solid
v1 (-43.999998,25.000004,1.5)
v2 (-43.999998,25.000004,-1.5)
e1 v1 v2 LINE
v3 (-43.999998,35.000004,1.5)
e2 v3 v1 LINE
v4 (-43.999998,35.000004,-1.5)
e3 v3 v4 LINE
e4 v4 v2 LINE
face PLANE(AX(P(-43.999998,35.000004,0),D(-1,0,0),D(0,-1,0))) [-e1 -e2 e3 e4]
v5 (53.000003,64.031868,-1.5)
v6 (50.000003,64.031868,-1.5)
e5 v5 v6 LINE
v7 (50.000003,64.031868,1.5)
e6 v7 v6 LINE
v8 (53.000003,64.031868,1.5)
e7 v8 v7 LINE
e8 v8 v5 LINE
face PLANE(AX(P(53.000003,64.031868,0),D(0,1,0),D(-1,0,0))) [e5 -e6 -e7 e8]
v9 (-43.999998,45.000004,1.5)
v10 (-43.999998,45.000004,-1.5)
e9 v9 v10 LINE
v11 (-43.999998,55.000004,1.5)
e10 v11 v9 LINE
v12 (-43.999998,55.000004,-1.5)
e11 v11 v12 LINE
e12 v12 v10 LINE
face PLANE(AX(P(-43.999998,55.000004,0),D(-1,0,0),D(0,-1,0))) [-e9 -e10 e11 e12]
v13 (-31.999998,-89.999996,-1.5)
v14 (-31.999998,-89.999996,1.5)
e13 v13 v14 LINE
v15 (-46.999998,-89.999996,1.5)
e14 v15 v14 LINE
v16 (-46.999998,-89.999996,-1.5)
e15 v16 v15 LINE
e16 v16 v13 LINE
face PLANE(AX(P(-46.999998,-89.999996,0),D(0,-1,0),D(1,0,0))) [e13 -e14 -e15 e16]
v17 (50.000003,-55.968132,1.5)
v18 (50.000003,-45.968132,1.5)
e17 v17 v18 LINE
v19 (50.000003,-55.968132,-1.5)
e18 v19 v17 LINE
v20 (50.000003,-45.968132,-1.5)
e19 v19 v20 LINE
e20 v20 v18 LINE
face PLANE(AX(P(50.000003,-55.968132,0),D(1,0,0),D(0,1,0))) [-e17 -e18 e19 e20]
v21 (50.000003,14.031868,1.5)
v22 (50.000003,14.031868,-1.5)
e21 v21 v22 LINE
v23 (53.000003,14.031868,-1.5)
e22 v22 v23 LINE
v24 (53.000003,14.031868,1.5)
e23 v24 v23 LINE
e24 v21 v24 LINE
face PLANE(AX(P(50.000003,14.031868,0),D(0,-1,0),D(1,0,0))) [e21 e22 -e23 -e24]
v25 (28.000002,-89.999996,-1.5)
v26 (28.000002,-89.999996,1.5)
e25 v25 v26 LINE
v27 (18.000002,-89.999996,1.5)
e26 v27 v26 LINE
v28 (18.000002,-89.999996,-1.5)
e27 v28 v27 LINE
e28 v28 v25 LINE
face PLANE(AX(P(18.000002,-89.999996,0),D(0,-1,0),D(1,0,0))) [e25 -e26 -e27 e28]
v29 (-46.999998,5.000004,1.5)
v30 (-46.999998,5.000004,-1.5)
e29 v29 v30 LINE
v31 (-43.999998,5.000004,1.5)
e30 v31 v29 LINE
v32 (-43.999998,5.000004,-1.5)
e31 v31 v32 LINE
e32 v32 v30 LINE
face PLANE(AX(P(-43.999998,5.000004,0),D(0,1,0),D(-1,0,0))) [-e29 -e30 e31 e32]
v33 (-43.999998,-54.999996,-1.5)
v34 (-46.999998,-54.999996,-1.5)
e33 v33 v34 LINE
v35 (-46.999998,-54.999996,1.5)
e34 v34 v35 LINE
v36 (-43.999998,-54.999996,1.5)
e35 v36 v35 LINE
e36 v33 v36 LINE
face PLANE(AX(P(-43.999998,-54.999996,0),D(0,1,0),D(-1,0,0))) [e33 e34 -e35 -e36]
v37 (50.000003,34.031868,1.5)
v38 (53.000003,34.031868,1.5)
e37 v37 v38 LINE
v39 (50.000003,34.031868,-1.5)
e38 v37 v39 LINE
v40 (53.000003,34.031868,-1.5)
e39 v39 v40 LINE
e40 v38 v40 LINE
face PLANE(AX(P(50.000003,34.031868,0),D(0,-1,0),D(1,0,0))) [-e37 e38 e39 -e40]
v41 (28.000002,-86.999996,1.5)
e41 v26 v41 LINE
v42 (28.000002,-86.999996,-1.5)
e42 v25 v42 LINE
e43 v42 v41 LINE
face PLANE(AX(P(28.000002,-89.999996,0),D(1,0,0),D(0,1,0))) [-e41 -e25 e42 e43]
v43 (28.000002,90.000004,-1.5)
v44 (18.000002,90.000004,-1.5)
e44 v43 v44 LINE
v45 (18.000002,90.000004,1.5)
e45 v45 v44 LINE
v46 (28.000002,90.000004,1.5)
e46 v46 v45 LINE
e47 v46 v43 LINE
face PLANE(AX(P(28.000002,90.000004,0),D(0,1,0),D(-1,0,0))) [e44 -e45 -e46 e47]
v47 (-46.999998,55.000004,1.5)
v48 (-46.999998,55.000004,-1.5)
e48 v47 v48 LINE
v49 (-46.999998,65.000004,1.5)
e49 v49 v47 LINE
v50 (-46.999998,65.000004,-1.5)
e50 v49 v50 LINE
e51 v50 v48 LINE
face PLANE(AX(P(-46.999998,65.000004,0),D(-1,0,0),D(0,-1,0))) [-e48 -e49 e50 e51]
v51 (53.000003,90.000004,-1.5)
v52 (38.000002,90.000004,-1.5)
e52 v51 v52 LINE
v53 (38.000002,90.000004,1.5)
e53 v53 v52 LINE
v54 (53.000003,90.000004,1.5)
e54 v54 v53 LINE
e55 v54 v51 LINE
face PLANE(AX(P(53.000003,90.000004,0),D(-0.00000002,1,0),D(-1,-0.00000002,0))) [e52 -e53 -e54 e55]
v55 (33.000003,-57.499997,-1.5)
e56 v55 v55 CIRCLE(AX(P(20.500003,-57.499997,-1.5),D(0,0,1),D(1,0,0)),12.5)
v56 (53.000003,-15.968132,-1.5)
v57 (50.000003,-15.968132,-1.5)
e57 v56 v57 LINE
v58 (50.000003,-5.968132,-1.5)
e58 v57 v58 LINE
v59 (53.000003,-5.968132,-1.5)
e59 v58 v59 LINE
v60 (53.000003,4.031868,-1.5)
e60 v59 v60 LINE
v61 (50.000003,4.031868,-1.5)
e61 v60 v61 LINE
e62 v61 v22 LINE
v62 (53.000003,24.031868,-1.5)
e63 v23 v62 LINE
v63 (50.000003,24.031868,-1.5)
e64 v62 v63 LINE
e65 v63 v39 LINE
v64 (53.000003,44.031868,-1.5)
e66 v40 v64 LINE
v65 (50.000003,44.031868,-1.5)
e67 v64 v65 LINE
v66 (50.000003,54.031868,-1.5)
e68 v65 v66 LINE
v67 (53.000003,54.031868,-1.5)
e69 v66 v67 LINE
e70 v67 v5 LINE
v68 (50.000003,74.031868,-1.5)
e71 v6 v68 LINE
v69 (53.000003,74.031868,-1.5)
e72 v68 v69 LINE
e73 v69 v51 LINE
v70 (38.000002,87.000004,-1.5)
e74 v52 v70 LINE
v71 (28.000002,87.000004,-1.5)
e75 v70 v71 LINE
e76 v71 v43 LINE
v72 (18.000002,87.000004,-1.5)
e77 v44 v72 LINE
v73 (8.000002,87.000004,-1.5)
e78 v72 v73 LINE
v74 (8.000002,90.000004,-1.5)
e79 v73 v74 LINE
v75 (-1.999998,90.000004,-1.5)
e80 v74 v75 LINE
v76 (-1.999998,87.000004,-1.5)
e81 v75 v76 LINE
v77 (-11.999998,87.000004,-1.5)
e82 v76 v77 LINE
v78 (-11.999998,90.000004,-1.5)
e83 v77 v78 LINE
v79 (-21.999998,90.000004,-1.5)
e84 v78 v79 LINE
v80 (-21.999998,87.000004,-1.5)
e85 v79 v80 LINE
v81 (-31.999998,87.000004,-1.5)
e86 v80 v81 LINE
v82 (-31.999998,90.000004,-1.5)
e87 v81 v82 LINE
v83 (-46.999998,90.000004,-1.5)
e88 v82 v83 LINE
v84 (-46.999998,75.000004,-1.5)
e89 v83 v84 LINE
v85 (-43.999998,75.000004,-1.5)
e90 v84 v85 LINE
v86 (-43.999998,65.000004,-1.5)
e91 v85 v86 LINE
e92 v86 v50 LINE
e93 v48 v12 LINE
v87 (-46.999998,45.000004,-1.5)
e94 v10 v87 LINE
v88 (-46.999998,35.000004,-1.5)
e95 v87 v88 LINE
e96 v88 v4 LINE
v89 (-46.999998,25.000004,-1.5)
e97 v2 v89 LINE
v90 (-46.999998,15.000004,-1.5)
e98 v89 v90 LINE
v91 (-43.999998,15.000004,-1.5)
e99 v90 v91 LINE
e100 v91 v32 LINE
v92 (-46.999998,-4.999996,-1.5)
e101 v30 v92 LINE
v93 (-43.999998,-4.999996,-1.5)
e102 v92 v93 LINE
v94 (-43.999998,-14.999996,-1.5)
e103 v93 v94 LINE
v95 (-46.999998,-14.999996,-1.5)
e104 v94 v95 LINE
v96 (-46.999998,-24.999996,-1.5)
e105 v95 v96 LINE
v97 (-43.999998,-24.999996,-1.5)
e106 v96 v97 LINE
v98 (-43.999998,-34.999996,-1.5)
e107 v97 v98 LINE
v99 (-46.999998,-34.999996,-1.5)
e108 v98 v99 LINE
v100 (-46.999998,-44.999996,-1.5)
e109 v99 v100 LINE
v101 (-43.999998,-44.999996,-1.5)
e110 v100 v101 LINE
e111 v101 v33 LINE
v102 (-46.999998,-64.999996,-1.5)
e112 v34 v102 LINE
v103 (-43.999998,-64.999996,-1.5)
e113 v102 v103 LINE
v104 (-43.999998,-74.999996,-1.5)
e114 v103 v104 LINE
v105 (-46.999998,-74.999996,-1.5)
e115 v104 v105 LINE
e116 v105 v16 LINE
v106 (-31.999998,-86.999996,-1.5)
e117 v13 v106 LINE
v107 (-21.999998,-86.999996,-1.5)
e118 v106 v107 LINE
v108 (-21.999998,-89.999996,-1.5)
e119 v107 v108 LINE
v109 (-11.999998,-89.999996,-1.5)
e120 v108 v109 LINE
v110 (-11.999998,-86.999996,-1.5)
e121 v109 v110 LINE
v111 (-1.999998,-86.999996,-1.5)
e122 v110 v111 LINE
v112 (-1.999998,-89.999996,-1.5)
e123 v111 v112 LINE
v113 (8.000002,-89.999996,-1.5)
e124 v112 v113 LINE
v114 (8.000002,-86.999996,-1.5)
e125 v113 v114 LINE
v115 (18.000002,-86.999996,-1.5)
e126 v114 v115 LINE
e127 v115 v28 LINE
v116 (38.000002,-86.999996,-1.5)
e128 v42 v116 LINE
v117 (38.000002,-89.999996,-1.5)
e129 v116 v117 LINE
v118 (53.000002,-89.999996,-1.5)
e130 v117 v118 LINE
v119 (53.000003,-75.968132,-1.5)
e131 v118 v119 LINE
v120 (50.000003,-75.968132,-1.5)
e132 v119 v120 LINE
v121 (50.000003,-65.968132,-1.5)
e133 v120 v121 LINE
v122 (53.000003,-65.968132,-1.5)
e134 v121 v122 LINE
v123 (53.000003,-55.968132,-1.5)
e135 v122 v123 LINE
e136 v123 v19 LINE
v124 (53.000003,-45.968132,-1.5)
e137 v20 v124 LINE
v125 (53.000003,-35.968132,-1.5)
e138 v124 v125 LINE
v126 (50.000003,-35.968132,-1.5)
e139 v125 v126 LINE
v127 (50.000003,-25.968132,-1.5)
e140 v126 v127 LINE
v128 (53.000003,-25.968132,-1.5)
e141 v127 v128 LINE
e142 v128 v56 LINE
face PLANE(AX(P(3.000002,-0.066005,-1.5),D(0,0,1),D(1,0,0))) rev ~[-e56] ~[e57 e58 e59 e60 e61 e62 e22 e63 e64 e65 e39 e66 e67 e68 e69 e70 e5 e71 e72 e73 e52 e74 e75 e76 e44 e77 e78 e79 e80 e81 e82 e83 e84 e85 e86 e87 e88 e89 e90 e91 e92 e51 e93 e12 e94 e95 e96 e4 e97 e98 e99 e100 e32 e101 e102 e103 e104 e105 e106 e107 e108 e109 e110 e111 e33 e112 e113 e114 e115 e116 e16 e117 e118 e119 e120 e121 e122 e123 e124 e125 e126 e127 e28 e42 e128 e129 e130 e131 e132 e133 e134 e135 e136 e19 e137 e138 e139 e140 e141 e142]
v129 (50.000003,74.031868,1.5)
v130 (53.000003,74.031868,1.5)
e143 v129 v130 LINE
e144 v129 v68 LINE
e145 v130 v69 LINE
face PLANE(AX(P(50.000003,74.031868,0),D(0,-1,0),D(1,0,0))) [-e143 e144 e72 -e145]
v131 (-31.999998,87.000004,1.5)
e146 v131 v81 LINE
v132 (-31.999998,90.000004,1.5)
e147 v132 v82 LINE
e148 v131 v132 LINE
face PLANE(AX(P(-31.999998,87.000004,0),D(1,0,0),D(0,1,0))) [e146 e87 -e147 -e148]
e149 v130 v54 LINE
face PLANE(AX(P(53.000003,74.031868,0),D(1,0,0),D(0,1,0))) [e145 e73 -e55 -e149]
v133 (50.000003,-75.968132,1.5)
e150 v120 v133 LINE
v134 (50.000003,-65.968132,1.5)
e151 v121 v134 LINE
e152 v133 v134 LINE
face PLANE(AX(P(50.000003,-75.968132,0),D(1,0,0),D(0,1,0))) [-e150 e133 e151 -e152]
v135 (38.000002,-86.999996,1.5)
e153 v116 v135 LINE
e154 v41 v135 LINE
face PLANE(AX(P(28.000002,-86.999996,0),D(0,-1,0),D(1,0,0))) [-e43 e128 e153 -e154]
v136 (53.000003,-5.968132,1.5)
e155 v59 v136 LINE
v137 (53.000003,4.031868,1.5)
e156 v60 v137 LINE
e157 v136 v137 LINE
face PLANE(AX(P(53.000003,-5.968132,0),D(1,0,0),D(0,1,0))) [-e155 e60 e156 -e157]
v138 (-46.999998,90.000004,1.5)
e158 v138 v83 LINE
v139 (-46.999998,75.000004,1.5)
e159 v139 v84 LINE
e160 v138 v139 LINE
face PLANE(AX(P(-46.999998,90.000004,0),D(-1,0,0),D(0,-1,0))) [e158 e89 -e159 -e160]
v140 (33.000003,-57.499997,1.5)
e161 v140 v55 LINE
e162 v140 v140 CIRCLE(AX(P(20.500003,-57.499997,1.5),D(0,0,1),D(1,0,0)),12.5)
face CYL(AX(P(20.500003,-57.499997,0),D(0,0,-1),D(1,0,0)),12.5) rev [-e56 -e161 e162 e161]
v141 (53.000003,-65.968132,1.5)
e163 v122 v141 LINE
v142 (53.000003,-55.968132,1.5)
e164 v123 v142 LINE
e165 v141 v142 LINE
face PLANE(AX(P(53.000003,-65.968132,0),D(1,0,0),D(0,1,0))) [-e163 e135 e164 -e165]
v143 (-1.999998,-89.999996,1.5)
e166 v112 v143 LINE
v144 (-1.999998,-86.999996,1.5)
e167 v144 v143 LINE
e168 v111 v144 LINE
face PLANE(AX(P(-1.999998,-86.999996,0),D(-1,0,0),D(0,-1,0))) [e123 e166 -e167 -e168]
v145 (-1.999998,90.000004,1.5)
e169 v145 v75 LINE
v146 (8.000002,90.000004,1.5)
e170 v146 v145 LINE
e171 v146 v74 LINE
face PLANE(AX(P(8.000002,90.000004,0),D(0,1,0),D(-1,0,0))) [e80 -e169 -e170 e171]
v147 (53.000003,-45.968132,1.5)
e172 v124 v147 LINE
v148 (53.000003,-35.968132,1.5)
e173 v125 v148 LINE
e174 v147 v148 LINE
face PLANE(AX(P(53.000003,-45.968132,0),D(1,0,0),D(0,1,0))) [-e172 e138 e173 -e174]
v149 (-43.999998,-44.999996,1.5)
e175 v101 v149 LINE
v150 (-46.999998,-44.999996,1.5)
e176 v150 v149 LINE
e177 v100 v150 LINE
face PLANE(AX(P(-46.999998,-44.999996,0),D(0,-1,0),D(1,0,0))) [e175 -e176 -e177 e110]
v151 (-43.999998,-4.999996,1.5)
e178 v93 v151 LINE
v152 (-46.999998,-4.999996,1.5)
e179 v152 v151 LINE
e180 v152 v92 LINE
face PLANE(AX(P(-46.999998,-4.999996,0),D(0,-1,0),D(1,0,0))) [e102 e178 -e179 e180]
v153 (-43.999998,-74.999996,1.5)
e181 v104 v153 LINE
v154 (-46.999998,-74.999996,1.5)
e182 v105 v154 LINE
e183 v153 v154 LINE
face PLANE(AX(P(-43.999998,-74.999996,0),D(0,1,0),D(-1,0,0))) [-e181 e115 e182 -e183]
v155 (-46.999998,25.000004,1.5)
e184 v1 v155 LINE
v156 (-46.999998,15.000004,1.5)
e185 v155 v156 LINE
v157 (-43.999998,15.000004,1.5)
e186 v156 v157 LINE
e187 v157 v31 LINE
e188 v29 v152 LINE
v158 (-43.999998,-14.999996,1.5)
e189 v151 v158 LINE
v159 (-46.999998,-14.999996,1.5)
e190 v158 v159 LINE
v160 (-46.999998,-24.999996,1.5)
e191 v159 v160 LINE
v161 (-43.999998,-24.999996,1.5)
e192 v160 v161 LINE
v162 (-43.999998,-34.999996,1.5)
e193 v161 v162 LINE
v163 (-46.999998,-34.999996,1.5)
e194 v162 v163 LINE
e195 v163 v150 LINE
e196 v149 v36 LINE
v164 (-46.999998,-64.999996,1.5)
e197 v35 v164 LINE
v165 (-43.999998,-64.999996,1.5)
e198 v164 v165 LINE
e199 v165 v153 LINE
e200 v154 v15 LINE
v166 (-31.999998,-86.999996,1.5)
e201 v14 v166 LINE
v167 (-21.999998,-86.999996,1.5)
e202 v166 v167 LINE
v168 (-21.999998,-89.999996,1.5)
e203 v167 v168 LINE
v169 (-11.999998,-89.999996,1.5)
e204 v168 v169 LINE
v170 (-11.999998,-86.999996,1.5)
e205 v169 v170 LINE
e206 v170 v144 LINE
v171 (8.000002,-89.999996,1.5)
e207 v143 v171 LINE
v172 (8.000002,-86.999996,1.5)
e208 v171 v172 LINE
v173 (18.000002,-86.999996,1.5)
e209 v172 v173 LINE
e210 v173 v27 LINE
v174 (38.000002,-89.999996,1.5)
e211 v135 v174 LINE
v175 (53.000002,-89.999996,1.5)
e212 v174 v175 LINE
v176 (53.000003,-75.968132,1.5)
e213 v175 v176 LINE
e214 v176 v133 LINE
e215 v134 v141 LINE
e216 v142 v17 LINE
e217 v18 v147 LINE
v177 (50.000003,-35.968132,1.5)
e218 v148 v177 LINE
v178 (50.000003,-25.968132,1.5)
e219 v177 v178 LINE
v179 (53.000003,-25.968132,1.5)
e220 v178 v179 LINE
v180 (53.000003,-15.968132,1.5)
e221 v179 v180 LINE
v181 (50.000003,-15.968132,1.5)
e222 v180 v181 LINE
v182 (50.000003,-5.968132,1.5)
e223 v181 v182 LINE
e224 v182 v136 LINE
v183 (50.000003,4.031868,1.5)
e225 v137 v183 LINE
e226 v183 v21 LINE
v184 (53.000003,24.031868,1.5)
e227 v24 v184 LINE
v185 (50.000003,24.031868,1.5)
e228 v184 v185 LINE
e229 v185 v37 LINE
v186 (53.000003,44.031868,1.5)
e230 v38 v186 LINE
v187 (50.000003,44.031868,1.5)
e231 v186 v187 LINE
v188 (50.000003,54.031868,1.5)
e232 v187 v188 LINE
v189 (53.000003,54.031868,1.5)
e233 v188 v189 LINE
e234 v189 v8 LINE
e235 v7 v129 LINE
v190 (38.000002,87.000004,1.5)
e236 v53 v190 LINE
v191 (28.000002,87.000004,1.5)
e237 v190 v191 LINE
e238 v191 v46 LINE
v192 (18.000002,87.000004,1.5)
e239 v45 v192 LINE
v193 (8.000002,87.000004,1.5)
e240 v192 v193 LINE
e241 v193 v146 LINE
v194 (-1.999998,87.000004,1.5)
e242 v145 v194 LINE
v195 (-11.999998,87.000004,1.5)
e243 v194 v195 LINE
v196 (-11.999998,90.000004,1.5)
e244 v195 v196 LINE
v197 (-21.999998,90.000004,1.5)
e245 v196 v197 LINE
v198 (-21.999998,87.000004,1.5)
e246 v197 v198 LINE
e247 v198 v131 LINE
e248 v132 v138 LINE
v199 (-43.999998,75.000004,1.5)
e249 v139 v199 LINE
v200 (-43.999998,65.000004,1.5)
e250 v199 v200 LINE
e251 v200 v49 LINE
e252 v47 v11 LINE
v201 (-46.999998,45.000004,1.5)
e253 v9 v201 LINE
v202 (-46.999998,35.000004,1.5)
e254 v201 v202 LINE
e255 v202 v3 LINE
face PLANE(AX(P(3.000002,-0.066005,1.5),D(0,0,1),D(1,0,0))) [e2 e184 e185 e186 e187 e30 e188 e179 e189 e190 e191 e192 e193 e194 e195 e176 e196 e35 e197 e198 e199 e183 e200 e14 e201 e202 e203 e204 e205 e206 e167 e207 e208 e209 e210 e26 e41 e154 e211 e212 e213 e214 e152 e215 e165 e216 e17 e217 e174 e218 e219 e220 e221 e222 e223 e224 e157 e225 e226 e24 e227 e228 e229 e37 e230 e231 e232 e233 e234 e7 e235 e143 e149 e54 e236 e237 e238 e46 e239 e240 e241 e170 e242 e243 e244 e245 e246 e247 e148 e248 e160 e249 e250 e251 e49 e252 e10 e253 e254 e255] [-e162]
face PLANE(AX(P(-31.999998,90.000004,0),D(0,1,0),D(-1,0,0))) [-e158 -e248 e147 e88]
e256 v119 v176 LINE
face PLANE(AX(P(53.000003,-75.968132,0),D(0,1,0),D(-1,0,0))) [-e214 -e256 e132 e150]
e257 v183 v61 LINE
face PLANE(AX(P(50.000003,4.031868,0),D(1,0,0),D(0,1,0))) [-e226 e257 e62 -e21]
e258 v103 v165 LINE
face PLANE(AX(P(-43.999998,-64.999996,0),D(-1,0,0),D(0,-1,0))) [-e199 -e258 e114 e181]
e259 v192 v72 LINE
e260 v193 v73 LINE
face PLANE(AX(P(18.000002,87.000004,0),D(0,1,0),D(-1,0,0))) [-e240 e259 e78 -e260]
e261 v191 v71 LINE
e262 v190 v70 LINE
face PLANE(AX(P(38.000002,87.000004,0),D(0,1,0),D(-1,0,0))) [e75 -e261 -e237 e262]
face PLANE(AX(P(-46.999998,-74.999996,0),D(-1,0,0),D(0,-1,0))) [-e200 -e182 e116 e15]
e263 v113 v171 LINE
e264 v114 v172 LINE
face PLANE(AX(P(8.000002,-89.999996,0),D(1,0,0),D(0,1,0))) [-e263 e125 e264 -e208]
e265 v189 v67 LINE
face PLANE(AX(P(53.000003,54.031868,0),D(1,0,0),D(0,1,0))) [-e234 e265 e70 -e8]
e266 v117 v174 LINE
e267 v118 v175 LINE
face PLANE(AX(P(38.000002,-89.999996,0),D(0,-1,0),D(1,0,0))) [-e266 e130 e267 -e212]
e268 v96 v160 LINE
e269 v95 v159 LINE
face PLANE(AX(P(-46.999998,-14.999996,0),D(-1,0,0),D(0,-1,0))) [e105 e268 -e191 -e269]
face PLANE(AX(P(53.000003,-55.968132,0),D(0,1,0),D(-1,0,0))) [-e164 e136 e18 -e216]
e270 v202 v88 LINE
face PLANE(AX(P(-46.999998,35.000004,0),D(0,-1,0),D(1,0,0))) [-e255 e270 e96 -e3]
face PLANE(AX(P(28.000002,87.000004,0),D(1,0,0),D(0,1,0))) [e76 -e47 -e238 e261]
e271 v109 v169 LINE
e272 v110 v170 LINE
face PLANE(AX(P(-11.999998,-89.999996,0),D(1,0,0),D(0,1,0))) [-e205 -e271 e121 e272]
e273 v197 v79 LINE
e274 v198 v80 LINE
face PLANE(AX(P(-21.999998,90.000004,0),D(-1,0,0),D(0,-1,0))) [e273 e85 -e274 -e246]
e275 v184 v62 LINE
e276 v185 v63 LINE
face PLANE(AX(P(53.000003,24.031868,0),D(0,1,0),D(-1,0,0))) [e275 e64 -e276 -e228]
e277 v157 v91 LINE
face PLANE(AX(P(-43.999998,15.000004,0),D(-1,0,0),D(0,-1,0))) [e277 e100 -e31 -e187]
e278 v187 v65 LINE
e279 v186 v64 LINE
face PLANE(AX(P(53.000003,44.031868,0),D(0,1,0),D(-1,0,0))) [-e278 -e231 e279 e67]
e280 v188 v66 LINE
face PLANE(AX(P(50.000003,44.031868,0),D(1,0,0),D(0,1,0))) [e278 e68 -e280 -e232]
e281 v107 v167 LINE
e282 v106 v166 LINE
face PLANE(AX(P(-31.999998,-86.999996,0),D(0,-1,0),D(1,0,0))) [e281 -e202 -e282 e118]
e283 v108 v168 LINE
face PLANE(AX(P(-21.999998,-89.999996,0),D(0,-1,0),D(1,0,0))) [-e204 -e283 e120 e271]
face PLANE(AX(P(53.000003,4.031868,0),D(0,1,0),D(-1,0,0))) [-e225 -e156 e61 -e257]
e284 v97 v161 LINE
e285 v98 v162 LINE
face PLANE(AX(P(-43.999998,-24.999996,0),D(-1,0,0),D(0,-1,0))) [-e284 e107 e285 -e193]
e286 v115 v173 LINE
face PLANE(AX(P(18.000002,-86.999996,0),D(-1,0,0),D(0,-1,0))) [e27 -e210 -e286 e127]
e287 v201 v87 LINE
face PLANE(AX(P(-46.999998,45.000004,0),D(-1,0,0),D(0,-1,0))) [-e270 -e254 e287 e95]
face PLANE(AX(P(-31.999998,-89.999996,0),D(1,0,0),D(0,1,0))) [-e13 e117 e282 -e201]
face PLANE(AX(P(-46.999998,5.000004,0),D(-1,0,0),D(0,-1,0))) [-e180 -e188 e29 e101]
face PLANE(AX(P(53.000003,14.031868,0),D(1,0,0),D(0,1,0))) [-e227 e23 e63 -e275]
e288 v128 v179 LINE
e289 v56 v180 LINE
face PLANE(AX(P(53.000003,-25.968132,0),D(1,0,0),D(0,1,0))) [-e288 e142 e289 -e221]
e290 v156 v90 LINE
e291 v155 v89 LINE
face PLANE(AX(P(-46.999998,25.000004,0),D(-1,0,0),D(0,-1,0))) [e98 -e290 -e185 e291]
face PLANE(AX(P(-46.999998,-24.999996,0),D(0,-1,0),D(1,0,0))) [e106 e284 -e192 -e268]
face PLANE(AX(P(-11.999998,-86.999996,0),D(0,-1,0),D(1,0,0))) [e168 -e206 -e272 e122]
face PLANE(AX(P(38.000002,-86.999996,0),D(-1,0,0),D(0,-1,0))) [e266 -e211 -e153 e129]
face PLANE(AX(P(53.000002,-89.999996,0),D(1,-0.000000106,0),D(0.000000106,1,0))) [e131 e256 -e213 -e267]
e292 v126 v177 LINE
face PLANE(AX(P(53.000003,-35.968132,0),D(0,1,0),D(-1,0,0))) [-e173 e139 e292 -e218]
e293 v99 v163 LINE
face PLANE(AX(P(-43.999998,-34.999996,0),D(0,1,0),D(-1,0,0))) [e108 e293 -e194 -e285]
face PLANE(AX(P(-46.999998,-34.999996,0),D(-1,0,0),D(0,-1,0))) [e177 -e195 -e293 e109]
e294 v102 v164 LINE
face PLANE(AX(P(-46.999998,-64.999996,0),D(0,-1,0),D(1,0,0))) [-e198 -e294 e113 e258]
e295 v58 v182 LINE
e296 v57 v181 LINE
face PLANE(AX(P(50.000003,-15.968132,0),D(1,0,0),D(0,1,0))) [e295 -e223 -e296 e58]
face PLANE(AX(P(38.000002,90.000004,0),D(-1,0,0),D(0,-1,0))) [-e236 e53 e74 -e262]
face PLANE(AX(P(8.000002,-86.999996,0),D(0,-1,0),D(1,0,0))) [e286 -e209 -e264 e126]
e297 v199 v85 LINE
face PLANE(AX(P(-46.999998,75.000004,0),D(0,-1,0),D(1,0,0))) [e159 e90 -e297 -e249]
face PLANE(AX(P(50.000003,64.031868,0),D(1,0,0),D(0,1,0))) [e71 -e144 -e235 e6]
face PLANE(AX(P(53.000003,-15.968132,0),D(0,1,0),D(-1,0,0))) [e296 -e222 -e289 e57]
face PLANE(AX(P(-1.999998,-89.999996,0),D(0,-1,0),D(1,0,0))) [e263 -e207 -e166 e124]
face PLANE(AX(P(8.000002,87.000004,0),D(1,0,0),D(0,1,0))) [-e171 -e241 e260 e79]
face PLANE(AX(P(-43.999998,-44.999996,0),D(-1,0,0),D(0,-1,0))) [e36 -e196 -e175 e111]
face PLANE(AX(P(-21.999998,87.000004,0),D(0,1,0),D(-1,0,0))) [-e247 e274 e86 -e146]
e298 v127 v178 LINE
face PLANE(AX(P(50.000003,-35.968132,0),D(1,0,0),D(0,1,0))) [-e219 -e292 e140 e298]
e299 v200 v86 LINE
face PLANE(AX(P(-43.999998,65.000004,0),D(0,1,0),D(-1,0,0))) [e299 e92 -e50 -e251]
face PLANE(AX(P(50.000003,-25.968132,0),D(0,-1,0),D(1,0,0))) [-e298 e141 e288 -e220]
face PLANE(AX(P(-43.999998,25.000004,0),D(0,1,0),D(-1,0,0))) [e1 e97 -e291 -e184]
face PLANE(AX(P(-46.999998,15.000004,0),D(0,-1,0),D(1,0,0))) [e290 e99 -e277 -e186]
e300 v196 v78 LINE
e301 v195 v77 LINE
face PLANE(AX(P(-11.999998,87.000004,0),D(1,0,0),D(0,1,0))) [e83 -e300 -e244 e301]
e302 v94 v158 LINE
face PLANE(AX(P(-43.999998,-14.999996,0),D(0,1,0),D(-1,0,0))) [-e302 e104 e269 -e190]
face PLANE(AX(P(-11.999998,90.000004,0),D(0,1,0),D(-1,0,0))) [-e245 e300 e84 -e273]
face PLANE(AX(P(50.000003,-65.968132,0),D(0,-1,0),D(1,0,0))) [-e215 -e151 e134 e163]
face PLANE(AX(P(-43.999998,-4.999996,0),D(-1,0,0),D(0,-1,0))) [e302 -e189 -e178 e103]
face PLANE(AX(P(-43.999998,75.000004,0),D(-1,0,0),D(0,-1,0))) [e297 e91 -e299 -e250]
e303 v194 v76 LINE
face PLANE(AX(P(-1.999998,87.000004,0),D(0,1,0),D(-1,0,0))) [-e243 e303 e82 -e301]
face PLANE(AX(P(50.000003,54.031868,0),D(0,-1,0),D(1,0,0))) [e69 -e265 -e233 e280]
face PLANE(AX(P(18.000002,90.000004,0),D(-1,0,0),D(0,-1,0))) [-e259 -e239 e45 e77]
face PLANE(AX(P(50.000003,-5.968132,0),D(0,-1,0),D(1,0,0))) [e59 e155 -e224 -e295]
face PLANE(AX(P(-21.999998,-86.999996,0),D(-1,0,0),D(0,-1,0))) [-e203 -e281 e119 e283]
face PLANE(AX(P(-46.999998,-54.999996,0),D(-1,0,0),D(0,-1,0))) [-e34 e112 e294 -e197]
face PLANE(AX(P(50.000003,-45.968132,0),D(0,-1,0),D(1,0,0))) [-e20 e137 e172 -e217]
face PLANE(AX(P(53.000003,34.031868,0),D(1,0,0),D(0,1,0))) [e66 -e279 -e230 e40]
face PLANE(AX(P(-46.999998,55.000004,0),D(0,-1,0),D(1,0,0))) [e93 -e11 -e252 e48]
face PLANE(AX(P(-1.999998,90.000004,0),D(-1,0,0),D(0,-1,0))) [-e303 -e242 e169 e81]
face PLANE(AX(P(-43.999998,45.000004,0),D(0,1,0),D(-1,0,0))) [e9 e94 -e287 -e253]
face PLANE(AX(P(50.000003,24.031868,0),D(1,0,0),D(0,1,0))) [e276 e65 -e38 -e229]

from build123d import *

# Parameters (mm, degrees)
F0_R     = 12.5
F1_DEPTH = 1.5


# Not quite as in the source:
# - ends of sketch curves that miss each other by under 0.0002 mm in the source are joined


with BuildPart() as f1:
    # F0 (on Top) → F1 (new body, symmetric)
    with BuildSketch(Plane.XY):
        Polygon((-46.9999983907, 3.8743e-06), (-46.9999983907, -4.9999961257), (-43.9999983907, -4.9999961257), (-43.9999983907, -14.9999961257), (-46.9999983907, -14.9999961257), (-46.9999983907, -24.9999961257), (-43.9999983907, -24.9999961257), (-43.9999983907, -34.9999961257), (-46.9999983907, -34.9999961257), (-46.9999983907, -44.9999961257), (-43.9999983907, -44.9999961257), (-43.9999983907, -54.9999961257), (-46.9999983907, -54.9999961257), (-46.9999983907, -64.9999961257), (-43.9999983907, -64.9999961257), (-43.9999983907, -74.9999961257), (-46.9999983907, -74.9999961257), (-46.9999983907, -89.9999961257), (-31.9999983907, -89.9999961257), (-31.9999983907, -86.9999961257), (-21.9999983907, -86.9999961257), (-21.9999983907, -89.9999961257), (-11.9999983907, -89.9999961257), (-11.9999983907, -86.9999961257), (-1.9999983907, -86.9999961257), (-1.9999983907, -89.9999961257), (8.0000016093, -89.9999961257), (8.0000016093, -86.9999961257), (18.0000016093, -86.9999961257), (18.0000016093, -89.9999961257), (28.0000016093, -89.9999961257), (28.0000016093, -86.9999961257), (38.0000016093, -86.9999961257), (38.0000016093, -89.9999961257), (53.0000016093, -89.9999961257), (53.0000030994, -75.968132019), (50.0000030994, -75.968132019), (50.0000030994, -65.968132019), (53.0000030994, -65.968132019), (53.0000030994, -55.968132019), (50.0000030994, -55.968132019), (50.0000030994, -45.968132019), (53.0000030994, -45.968132019), (53.0000030994, -35.968132019), (50.0000030994, -35.968132019), (50.0000030994, -25.968132019), (53.0000030994, -25.968132019), (53.0000030994, -15.968132019), (50.0000030994, -15.968132019), (50.0000030994, -5.968132019), (53.0000030994, -5.968132019), (53.0000030994, 3.8743e-06), (53.0000030994, 4.031867981), (50.0000030994, 4.031867981), (50.0000030994, 14.031867981), (53.0000030994, 14.031867981), (53.0000030994, 24.031867981), (50.0000030994, 24.031867981), (50.0000030994, 34.031867981), (53.0000030994, 34.031867981), (53.0000030994, 44.031867981), (50.0000030994, 44.031867981), (50.0000030994, 54.031867981), (53.0000030994, 54.031867981), (53.0000030994, 64.031867981), (50.0000030994, 64.031867981), (50.0000030994, 74.031867981), (53.0000030994, 74.031867981), (53.0000030994, 90.0000038743), (38.0000016093, 90.0000035763), (38.0000016093, 87.0000035763), (28.0000016093, 87.0000035763), (28.0000016093, 90.0000035763), (18.0000016093, 90.0000035763), (18.0000016093, 87.0000035763), (8.0000016093, 87.0000035763), (8.0000016093, 90.0000035763), (-1.9999983907, 90.0000035763), (-1.9999983907, 87.0000035763), (-11.9999983907, 87.0000035763), (-11.9999983907, 90.0000035763), (-21.9999983907, 90.0000035763), (-21.9999983907, 87.0000035763), (-31.9999983907, 87.0000035763), (-31.9999983907, 90.0000035763), (-46.9999983907, 90.0000035763), (-46.9999983907, 75.0000038743), (-43.9999983907, 75.0000038743), (-43.9999983907, 65.0000038743), (-46.9999983907, 65.0000038743), (-46.9999983907, 55.0000038743), (-43.9999983907, 55.0000038743), (-43.9999983907, 45.0000038743), (-46.9999983907, 45.0000038743), (-46.9999983907, 35.0000038743), (-43.9999983907, 35.0000038743), (-43.9999983907, 25.0000038743), (-46.9999983907, 25.0000038743), (-46.9999983907, 15.0000038743), (-43.9999983907, 15.0000038743), (-43.9999983907, 5.0000038743), (-46.9999983907, 5.0000038743), align=None)
        with Locations((20.5000030994, -57.4999969183)):
            Circle(F0_R, mode=Mode.SUBTRACT)
    extrude(amount=F1_DEPTH, both=True)


solid = f1.part
